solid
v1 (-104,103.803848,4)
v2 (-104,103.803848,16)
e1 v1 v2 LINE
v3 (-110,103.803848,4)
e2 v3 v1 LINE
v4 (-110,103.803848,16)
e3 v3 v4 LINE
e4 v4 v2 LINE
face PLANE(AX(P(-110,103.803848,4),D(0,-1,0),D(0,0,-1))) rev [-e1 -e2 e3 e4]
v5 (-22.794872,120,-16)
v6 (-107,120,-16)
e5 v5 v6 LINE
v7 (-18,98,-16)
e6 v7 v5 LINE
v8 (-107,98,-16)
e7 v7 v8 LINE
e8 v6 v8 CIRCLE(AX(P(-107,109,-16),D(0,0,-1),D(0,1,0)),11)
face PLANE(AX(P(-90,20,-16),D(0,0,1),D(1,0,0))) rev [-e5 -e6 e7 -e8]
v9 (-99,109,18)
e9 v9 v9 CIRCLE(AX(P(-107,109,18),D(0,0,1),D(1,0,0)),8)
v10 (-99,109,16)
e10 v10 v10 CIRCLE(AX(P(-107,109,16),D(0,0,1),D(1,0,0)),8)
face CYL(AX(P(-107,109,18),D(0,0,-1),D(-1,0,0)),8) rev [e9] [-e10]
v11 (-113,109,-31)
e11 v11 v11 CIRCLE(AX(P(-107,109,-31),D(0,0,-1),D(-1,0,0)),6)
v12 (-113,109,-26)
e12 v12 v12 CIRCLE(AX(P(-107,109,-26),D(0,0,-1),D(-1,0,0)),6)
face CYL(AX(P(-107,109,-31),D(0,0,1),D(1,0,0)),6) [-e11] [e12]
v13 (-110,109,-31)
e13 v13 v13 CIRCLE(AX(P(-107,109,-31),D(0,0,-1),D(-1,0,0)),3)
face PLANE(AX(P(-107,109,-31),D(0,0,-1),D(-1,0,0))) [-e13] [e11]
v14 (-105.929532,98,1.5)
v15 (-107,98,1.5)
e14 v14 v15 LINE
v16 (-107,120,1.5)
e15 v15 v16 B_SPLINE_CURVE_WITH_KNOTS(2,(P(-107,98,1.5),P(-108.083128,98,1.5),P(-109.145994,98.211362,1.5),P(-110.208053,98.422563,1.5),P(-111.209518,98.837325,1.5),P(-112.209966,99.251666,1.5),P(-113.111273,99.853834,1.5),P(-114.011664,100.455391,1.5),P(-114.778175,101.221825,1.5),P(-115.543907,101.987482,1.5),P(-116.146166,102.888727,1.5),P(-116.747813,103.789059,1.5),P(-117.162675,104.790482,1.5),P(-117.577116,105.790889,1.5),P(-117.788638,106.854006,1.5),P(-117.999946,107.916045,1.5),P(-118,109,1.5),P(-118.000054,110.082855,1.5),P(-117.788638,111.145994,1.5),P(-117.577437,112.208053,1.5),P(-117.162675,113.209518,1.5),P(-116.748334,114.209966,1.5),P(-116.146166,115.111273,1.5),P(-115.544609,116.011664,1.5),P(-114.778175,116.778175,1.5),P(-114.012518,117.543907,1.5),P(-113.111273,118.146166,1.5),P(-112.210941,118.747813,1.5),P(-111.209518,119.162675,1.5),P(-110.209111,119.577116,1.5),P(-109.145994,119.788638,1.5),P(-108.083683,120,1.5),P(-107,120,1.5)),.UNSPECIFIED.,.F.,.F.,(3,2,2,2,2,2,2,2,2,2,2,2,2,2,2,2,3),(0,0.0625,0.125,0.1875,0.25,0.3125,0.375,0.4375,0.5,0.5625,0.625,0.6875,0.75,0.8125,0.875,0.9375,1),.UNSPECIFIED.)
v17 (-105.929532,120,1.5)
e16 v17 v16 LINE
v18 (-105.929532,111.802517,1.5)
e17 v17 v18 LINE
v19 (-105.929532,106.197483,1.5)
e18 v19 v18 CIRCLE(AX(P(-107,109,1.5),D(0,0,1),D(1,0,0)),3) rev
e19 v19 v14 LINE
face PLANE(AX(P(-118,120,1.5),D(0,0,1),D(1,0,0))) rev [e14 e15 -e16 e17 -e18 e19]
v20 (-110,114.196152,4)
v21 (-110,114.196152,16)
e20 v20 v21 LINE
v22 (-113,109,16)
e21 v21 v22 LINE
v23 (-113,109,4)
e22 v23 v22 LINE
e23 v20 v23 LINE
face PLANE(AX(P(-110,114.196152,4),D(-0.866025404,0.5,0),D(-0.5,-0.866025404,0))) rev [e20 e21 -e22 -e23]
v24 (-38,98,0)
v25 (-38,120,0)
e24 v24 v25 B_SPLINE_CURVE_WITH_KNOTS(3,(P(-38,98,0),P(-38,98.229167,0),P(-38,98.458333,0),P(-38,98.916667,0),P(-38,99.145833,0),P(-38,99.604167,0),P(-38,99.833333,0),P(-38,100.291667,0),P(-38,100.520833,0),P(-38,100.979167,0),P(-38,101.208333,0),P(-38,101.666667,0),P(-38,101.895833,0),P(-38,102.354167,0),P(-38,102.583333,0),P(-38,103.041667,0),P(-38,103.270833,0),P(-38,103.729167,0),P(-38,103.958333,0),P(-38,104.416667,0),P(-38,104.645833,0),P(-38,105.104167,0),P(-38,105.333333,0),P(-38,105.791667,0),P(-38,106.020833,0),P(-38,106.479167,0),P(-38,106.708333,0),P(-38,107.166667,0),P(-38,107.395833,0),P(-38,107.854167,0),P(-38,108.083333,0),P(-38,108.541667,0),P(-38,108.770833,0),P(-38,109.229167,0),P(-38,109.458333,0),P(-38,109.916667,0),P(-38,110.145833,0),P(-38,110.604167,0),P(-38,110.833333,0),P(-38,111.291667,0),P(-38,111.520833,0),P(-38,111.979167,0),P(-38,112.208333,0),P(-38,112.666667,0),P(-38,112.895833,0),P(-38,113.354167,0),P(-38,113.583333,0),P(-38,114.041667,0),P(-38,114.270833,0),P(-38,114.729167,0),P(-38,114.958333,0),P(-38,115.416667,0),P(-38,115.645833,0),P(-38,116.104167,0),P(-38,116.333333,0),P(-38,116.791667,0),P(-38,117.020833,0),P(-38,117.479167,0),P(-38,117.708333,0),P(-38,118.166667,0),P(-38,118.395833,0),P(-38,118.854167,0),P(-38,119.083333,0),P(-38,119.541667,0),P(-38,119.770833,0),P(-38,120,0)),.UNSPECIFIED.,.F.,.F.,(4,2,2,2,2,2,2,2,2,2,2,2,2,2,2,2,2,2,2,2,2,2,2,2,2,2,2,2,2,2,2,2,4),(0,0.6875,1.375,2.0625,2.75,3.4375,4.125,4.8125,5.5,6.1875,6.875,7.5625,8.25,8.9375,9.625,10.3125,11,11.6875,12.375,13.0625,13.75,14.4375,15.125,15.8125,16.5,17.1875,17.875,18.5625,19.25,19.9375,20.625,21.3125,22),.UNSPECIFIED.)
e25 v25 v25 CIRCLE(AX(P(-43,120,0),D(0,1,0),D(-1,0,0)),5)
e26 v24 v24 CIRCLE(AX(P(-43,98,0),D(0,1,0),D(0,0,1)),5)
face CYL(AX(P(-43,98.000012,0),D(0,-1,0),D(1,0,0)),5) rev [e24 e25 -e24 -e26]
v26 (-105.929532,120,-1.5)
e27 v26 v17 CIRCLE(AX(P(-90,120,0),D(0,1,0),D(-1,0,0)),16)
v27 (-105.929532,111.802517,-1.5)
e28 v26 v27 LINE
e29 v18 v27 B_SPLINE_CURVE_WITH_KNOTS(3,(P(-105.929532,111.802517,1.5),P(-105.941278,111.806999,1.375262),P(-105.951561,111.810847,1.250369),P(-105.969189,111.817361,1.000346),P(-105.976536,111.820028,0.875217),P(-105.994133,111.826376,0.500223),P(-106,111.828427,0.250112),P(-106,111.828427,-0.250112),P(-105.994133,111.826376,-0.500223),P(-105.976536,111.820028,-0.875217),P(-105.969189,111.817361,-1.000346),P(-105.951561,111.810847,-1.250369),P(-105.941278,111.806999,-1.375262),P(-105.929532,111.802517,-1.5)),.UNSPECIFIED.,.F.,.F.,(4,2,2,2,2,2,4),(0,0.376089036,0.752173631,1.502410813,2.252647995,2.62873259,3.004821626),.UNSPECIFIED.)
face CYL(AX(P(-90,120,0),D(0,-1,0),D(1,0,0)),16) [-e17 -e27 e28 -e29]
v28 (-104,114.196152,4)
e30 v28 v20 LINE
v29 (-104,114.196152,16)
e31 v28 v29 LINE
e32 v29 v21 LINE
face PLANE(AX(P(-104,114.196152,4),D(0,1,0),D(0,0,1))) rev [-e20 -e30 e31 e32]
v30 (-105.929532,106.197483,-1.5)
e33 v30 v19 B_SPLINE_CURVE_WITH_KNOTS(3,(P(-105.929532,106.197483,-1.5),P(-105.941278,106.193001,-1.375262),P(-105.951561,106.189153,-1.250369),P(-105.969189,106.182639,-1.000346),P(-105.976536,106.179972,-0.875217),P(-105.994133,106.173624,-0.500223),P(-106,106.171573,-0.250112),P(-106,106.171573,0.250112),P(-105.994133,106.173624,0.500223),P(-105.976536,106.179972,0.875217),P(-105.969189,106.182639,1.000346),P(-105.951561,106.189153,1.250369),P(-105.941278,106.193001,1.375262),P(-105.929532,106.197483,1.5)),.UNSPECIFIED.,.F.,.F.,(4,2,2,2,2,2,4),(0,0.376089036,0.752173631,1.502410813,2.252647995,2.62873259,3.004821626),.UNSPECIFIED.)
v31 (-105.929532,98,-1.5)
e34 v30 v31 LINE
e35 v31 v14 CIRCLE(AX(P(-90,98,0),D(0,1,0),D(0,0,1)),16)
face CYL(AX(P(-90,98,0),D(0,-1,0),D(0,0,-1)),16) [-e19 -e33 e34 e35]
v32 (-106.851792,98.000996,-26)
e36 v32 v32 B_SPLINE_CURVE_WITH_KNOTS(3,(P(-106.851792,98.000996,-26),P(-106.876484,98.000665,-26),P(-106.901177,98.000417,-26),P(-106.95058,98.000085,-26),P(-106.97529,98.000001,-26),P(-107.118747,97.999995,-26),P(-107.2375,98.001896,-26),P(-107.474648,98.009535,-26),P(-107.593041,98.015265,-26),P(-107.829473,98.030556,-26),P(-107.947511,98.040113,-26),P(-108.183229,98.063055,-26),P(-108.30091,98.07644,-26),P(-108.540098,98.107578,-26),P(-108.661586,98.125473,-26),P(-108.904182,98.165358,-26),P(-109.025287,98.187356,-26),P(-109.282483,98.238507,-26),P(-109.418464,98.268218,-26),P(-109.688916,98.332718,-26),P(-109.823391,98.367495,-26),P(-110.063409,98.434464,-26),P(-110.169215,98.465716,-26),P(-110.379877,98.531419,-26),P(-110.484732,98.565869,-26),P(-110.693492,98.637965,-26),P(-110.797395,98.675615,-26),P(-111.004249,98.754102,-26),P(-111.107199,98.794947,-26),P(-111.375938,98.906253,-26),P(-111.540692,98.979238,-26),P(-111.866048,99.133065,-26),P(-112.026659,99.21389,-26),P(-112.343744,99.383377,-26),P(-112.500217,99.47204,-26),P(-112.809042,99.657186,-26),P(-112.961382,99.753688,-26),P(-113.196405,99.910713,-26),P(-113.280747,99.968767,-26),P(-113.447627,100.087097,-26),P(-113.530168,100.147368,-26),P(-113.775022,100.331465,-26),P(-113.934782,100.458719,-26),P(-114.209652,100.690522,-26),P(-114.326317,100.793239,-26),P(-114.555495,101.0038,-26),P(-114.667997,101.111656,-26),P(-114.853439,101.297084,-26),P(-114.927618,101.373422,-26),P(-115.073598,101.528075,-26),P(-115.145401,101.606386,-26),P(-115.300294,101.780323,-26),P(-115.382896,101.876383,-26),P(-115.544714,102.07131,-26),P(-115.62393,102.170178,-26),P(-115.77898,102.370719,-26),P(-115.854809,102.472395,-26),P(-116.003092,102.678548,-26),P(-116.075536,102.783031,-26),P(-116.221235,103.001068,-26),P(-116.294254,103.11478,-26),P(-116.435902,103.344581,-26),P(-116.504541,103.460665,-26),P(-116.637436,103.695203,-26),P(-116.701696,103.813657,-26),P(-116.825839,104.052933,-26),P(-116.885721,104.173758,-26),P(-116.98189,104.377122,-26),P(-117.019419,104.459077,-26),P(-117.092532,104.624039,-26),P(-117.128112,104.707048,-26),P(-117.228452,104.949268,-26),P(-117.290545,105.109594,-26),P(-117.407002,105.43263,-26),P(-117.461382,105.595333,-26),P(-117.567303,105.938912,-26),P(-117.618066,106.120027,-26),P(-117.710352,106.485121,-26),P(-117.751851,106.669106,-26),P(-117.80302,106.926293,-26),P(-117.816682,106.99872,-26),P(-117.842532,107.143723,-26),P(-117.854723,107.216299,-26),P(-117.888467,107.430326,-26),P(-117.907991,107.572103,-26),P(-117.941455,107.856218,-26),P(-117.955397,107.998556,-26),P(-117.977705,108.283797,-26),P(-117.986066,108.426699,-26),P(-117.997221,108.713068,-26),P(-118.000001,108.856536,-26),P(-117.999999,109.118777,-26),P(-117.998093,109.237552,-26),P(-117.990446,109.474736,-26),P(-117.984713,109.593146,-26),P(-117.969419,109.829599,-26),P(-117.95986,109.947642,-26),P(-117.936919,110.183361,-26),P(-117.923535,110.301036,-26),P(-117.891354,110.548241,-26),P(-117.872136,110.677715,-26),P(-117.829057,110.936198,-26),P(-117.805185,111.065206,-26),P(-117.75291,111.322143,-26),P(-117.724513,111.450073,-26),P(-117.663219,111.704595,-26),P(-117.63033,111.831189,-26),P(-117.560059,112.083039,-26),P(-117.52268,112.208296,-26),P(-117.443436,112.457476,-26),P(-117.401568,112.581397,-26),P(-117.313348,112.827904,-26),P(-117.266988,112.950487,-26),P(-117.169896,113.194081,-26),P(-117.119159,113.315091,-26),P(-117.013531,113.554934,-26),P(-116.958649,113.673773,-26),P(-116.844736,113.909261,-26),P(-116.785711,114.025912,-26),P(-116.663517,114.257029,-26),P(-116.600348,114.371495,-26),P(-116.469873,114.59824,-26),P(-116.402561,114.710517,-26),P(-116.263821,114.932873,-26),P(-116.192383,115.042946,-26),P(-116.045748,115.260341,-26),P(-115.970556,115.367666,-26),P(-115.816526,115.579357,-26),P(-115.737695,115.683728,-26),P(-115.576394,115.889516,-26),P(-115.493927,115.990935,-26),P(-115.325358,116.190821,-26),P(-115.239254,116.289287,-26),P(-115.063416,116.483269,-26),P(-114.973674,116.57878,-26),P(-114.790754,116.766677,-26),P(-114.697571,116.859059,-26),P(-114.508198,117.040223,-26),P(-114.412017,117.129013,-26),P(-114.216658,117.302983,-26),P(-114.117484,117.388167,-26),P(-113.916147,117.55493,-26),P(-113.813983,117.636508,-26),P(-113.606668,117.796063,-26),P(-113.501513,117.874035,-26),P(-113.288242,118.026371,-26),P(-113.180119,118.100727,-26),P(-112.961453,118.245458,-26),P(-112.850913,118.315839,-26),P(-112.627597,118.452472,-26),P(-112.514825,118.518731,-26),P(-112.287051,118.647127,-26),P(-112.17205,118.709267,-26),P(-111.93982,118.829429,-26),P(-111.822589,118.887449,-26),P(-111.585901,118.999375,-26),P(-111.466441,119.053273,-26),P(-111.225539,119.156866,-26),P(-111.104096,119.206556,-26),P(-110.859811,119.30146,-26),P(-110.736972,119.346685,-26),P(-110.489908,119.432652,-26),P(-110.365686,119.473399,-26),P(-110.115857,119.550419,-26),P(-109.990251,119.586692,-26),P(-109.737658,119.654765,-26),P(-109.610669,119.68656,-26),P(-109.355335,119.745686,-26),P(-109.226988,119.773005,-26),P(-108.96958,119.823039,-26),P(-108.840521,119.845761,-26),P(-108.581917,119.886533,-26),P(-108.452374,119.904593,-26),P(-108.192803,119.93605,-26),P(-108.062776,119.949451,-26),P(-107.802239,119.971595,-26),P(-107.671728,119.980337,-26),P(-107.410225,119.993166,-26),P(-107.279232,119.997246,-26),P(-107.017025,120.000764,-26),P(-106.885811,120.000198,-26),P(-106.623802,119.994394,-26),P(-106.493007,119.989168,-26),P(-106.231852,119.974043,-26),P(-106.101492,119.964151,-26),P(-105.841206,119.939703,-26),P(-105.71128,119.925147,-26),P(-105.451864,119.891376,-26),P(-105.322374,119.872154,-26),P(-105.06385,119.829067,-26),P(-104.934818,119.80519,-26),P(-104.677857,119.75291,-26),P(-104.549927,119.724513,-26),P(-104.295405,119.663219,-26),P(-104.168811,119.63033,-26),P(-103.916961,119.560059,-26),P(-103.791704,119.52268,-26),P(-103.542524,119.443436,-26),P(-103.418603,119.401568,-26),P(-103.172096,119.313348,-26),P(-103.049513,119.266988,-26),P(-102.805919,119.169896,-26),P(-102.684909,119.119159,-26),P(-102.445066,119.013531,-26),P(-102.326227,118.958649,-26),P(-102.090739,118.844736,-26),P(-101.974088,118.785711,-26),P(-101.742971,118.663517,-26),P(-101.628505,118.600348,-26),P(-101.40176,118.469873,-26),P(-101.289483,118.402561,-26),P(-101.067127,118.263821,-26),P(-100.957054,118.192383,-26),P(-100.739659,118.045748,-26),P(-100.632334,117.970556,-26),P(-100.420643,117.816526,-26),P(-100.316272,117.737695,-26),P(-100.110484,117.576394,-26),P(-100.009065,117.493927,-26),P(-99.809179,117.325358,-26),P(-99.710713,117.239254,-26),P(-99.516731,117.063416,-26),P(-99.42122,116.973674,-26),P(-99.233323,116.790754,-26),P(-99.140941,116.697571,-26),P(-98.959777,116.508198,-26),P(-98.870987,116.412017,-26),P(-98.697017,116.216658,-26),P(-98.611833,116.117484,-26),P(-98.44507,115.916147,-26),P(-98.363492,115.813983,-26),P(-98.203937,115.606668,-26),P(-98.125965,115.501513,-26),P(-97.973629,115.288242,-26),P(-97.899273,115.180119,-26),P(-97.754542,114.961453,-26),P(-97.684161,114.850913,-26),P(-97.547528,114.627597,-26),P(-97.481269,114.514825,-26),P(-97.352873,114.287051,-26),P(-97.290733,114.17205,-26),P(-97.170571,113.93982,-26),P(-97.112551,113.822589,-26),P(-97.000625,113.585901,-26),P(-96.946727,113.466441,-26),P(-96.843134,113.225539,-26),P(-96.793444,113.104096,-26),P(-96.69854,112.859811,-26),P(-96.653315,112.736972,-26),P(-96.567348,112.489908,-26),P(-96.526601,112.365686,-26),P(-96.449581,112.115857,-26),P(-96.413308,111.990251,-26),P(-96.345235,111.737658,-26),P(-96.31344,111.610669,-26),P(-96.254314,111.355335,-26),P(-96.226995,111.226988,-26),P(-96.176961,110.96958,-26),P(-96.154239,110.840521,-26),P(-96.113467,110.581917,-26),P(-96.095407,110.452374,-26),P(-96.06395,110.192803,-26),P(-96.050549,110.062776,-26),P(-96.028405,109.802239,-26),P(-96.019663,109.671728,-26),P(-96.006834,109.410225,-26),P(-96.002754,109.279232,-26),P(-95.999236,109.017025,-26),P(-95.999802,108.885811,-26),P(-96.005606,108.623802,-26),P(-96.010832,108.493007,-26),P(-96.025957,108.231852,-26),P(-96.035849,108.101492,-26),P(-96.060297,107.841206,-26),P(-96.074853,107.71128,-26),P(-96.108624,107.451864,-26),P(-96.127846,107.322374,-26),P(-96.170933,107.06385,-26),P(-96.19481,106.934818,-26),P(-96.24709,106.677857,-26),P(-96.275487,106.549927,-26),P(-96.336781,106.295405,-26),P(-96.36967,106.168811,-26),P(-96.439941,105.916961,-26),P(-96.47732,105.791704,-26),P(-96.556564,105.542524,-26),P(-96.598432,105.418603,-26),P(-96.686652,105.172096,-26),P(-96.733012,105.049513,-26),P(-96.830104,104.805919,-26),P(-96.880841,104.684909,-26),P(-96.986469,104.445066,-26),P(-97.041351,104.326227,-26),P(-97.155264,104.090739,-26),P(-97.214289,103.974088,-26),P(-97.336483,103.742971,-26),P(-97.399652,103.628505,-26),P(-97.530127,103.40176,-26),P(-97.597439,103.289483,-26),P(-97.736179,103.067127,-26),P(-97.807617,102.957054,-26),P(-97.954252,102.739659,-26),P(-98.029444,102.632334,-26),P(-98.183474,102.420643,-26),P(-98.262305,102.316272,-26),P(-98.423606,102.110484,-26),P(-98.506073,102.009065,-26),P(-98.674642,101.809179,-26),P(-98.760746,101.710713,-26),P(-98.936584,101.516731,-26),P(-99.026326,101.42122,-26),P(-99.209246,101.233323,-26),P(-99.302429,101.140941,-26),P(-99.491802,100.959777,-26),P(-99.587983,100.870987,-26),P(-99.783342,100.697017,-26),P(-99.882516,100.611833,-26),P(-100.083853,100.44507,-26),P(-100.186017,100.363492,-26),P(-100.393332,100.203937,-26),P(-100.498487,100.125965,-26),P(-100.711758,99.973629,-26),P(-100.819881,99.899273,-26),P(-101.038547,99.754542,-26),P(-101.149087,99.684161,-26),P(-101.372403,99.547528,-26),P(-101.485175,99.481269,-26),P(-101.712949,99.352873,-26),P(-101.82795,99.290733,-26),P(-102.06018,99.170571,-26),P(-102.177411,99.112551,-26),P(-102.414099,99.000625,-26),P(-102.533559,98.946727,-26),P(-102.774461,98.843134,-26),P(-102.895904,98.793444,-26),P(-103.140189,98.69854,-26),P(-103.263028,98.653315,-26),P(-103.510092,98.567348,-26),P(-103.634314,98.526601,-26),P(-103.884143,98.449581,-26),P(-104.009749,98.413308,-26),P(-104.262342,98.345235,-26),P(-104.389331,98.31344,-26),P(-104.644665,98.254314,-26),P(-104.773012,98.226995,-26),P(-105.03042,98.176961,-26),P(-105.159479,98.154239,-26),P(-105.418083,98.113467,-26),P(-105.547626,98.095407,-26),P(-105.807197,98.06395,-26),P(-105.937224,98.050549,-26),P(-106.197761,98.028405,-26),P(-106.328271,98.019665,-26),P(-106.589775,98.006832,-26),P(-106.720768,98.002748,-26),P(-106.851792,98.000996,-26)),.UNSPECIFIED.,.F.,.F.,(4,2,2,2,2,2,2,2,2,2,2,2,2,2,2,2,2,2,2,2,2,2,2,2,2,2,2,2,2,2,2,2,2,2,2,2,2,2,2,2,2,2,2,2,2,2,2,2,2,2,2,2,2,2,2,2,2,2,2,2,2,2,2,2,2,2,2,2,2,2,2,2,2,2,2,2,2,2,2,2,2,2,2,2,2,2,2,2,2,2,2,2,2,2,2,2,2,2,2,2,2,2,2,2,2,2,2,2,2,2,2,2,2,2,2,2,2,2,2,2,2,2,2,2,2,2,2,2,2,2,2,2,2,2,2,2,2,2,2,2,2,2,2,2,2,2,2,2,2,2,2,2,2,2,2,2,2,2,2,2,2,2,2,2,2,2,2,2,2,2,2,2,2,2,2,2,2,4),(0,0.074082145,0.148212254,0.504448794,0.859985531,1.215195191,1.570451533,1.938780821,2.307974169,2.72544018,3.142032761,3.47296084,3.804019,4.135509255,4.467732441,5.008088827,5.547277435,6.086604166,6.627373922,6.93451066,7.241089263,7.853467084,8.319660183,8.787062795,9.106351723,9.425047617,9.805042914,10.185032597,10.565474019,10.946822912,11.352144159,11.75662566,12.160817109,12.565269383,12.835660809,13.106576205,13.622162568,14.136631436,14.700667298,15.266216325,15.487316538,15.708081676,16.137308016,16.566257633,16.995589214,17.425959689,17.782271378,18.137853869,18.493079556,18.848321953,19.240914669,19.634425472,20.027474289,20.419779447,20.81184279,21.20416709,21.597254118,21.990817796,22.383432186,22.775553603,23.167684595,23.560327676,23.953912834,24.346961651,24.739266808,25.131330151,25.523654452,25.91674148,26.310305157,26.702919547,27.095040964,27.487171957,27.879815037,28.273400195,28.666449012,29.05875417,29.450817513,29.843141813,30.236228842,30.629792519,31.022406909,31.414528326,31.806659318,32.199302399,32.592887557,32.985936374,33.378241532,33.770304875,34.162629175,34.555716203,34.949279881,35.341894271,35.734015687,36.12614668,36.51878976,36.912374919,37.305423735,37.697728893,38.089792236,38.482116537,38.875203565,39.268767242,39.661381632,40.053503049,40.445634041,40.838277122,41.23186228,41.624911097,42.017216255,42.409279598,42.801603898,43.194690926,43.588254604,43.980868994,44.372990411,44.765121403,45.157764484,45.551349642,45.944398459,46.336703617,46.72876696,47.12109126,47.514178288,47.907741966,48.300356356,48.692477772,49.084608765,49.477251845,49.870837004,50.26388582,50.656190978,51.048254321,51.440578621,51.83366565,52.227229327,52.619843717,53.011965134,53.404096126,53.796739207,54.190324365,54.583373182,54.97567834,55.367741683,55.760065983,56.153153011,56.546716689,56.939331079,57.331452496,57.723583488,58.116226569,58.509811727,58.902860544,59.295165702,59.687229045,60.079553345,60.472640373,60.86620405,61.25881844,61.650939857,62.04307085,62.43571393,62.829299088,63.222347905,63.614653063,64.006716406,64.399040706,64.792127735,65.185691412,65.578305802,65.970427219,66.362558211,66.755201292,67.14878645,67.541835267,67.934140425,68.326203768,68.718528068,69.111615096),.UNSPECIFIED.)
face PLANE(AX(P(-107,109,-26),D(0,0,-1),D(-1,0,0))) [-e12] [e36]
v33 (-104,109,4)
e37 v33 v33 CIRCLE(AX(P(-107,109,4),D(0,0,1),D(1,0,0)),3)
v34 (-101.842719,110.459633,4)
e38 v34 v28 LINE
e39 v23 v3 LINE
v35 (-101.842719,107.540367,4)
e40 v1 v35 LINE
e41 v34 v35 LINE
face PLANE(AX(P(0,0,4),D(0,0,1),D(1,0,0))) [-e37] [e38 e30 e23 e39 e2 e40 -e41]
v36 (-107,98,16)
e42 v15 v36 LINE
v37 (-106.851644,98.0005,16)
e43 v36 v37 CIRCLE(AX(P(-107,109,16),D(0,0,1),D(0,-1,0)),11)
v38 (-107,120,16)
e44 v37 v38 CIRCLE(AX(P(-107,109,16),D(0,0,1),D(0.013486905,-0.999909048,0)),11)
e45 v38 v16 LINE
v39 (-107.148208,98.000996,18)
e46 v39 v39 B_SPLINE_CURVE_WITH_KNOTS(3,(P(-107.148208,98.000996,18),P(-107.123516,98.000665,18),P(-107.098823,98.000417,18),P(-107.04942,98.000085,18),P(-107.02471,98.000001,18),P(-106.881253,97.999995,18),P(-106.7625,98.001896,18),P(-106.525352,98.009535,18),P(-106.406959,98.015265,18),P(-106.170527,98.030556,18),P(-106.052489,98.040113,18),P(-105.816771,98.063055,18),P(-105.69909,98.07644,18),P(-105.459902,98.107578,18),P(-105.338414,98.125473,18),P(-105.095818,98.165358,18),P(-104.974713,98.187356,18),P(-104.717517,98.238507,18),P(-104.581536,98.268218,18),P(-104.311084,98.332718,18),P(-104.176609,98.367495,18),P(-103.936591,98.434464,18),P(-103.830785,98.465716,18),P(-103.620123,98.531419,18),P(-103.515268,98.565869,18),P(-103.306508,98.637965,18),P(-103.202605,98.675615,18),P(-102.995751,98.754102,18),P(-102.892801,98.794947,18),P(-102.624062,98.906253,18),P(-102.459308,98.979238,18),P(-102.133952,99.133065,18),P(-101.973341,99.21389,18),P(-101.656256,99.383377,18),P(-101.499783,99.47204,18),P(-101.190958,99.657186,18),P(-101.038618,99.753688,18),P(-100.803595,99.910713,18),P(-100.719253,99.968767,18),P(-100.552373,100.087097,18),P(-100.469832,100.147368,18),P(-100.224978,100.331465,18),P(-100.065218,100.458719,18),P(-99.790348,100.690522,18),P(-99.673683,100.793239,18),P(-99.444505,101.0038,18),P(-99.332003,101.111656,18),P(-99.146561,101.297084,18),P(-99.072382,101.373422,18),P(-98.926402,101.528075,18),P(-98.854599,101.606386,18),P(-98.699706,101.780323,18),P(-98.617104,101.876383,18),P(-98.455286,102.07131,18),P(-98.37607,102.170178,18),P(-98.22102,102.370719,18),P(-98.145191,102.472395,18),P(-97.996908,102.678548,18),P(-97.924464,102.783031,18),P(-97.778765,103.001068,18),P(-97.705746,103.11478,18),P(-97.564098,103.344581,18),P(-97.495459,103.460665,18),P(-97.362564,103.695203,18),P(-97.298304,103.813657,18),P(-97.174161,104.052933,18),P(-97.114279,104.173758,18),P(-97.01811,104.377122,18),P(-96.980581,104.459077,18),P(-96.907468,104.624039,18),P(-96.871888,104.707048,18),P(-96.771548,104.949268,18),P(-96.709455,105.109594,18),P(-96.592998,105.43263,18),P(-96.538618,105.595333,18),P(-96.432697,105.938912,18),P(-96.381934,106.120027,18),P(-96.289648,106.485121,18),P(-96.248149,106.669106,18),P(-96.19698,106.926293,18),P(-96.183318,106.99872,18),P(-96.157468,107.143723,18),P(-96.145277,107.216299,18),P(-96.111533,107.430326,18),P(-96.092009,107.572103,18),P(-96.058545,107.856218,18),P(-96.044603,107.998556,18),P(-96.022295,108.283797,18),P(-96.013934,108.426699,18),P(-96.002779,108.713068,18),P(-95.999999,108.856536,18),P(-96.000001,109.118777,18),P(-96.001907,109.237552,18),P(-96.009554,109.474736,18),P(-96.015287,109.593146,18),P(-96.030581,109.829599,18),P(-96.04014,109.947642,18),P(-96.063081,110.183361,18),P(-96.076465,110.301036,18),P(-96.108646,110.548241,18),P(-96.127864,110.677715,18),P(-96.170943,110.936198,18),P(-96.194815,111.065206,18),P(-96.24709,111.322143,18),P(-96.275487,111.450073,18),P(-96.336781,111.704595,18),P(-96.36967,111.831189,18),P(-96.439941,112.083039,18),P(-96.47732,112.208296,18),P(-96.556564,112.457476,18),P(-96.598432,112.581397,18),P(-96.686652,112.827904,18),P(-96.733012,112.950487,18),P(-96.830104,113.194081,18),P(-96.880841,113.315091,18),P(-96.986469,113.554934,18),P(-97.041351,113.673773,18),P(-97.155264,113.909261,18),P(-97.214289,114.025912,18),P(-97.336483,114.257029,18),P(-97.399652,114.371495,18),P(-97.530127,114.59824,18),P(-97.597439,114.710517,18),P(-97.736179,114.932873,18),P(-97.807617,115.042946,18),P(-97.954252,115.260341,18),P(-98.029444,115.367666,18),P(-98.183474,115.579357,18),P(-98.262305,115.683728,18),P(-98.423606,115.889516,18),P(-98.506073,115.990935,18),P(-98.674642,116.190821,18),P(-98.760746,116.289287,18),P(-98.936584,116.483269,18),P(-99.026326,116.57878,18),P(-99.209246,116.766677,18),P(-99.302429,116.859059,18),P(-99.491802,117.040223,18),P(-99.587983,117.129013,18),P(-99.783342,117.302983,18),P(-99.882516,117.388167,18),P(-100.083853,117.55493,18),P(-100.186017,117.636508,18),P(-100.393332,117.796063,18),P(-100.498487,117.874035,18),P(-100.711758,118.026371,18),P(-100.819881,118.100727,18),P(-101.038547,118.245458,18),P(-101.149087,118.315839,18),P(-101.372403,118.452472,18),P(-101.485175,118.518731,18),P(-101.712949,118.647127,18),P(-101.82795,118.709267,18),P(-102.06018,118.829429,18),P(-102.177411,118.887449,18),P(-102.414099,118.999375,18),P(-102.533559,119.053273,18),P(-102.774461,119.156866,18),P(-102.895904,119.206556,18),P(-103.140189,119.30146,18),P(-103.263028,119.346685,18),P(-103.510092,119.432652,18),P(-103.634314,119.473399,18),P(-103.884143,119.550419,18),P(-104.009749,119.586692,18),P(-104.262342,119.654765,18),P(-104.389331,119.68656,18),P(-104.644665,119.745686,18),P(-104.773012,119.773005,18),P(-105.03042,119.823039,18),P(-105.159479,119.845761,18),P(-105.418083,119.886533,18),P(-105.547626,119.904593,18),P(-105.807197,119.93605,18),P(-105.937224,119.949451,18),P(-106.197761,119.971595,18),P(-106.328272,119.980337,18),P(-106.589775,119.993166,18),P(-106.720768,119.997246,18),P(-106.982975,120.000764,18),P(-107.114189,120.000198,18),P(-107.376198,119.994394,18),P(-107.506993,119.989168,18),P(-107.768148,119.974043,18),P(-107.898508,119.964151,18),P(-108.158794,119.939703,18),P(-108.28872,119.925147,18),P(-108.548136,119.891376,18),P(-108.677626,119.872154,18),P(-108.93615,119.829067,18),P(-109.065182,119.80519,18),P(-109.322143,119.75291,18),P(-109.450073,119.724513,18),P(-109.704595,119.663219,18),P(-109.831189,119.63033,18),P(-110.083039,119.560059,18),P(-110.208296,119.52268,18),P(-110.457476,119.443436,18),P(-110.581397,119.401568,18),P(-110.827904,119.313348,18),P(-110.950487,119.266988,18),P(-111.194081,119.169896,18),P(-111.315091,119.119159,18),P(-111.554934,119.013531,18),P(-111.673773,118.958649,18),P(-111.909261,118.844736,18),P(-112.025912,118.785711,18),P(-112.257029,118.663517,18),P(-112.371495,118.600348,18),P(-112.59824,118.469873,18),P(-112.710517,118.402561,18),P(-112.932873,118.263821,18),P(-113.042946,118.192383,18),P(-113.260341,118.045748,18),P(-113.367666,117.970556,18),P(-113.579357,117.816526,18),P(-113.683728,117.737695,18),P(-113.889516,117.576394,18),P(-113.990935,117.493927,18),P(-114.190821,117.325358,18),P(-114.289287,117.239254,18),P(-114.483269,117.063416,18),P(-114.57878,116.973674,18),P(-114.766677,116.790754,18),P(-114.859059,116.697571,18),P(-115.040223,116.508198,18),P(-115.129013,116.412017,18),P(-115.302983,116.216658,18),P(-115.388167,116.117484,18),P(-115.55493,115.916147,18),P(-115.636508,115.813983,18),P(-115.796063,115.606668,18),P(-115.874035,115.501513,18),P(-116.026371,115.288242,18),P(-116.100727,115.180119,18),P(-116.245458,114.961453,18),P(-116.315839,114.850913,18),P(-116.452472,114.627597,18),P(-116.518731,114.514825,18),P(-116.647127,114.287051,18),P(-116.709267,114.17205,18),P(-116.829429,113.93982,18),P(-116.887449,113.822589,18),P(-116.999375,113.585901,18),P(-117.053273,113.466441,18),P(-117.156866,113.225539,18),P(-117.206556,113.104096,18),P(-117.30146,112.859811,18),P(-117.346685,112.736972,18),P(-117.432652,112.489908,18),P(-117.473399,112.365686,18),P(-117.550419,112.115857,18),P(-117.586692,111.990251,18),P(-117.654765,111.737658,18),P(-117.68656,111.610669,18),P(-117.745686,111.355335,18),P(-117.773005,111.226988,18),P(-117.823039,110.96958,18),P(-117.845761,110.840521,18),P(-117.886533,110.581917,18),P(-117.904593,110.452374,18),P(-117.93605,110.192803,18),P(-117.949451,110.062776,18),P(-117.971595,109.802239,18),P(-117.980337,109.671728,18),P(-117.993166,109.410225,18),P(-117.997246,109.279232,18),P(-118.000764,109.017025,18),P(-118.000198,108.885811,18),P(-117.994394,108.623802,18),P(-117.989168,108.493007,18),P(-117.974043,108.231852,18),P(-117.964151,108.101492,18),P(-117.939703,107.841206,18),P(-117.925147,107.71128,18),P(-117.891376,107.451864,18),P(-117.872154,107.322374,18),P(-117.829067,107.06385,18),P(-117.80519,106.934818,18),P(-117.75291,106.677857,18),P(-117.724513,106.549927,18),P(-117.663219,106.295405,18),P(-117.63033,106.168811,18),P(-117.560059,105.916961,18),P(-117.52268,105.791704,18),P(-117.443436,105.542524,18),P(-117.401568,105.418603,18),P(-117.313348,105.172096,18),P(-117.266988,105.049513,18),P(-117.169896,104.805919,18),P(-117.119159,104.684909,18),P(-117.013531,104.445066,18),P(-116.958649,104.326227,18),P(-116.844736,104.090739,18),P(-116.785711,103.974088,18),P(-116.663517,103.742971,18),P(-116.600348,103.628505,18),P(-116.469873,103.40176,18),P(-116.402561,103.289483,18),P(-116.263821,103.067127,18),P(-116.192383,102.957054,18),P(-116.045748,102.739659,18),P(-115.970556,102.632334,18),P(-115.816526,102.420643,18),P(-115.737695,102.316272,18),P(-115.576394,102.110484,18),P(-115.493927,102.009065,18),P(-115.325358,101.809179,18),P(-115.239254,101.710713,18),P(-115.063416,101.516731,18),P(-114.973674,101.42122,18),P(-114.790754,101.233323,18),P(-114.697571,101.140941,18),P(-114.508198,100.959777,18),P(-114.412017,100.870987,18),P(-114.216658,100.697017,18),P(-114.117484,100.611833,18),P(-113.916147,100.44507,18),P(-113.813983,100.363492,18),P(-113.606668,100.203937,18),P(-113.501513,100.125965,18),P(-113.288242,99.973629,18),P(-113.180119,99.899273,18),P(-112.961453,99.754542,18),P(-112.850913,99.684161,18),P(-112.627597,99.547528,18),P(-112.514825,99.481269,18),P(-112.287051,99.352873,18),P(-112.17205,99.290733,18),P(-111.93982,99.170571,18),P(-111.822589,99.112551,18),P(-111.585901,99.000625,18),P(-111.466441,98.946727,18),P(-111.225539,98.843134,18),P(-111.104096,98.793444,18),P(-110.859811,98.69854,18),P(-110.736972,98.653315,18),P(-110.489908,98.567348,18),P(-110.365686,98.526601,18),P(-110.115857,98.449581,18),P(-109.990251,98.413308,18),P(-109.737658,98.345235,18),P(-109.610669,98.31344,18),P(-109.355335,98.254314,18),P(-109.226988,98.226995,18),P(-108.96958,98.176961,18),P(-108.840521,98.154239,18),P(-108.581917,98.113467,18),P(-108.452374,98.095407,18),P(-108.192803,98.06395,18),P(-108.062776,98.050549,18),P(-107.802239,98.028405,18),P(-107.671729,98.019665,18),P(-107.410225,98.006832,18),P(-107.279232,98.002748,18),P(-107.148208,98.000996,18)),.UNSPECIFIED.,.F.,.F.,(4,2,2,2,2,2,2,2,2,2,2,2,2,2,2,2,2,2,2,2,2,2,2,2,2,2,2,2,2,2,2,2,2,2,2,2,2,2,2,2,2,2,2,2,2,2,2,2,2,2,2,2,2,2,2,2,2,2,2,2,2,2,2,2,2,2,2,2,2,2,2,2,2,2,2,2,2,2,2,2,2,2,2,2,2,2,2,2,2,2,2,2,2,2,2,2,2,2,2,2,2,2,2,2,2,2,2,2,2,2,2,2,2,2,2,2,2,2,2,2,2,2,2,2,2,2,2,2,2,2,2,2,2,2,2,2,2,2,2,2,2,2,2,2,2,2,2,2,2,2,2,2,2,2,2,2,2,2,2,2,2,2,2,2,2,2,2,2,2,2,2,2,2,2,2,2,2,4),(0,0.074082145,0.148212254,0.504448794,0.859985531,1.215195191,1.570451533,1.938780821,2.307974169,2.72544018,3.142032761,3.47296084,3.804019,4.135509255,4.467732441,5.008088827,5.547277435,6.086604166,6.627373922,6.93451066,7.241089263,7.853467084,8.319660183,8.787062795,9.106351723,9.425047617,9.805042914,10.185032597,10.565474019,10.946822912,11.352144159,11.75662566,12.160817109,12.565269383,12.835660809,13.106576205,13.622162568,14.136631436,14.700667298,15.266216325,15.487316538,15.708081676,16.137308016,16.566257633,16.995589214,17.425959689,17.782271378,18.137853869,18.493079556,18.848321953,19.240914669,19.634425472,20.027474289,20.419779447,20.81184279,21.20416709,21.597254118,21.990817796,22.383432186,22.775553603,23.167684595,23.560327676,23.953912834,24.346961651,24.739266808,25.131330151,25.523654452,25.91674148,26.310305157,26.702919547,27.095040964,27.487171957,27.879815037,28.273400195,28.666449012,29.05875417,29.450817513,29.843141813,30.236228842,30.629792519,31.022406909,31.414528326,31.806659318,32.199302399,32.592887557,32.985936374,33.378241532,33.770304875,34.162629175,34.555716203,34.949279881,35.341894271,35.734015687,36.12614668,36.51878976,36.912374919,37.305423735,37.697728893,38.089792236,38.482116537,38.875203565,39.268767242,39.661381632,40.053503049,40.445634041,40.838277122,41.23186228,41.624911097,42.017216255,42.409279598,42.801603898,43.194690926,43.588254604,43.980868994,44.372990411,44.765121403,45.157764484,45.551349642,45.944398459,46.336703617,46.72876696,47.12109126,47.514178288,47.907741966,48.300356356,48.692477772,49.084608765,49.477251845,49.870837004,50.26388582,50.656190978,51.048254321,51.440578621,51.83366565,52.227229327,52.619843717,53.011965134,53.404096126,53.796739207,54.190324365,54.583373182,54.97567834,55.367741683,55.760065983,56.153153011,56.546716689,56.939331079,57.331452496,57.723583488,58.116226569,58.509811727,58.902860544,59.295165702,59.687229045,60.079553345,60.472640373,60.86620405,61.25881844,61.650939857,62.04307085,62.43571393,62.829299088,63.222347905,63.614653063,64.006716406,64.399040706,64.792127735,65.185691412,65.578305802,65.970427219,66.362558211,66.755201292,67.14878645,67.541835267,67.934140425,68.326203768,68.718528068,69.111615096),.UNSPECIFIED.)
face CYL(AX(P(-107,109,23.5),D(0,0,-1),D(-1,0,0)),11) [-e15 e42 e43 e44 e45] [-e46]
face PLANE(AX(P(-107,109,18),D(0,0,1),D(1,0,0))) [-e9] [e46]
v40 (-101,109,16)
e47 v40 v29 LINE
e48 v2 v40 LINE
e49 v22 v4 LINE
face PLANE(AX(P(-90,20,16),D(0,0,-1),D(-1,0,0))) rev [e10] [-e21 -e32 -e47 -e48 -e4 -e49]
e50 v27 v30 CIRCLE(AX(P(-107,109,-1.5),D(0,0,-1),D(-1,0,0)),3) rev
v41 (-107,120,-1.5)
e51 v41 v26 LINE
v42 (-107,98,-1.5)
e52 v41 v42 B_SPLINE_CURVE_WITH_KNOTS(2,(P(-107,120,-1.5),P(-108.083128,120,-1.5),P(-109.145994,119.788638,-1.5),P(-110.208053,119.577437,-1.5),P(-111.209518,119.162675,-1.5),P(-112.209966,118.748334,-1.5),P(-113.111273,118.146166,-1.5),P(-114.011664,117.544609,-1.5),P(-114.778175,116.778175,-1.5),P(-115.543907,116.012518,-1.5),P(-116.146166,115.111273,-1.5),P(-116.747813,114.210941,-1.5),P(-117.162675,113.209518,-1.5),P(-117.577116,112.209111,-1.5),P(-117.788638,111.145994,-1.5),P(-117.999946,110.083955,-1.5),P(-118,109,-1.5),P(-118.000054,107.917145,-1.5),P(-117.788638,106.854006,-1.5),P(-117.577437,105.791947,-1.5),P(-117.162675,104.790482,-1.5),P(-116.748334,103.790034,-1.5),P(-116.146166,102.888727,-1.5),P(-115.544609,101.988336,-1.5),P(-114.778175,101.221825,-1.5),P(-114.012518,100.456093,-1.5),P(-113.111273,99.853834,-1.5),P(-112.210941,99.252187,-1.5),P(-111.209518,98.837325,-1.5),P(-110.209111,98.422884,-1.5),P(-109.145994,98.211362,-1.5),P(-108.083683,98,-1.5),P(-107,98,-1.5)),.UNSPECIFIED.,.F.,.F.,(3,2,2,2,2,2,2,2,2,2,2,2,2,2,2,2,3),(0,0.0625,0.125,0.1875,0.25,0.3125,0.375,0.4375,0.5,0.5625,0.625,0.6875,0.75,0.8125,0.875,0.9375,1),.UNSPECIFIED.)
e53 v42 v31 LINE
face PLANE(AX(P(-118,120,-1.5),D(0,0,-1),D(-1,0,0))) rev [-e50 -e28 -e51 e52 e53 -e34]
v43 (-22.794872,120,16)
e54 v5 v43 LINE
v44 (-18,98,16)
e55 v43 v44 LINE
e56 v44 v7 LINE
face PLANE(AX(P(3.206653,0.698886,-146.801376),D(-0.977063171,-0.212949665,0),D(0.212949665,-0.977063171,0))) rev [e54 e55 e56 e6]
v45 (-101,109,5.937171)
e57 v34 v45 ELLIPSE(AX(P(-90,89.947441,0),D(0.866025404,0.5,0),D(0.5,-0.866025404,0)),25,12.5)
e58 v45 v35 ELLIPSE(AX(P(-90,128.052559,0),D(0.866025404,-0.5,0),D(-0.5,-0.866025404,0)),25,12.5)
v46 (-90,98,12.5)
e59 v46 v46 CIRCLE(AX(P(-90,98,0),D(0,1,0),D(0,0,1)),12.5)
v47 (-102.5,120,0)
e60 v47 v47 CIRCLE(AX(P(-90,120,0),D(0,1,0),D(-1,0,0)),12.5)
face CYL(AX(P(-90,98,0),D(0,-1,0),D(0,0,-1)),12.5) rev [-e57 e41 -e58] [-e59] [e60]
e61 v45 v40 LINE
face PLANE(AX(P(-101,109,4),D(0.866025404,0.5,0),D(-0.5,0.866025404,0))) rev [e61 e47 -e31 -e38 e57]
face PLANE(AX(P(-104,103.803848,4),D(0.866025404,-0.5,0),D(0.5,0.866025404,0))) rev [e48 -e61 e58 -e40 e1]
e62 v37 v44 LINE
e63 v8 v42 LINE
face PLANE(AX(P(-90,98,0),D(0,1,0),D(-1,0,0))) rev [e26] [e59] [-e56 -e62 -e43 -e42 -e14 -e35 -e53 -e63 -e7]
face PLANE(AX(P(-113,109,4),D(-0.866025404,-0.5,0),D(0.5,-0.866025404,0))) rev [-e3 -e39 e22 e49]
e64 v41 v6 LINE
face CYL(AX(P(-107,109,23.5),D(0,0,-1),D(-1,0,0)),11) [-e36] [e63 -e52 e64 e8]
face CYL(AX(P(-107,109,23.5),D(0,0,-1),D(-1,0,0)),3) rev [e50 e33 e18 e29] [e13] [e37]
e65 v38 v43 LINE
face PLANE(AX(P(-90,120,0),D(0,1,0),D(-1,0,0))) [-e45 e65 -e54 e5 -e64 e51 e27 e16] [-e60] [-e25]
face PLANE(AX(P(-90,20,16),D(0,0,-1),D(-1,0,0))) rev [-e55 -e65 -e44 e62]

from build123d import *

# Parameters (mm, degrees)
BOSS_EXTRUDE1_DEPTH            = 20
SKETCH2_R                      = 12.5
CUT_EXTRUDE1_DEPTH             = 20
CUT_EXTRUDE3_DEPTH             = 16
BOSS_EXTRUDE9_DEPTH            = 32
CUT_EXTRUDE5_OUTLINE_R         = 12.5
CUT_EXTRUDE5_DEPTH             = 20
SKETCH10_R                     = 7.5
BOSS_EXTRUDE10_DEPTH           = 6
SKETCH11_R                     = 6.5
BOSS_EXTRUDE11_DEPTH           = 5
FILLET5_R                      = 1
FILLET6_R                      = 1
CUT_EXTRUDE7_DEPTH             = 147.965990964
CUT_EXTRUDE7_DEPTH_BACK        = 147.965990964
CUT_EXTRUDE8_REACH             = 148.864
SKETCH21_R                     = 5
CUT_EXTRUDE8_DIRECTION_2_DEPTH = 147.863882558
SKETCH23_R                     = 12.5
SKETCH23_R_2                   = 5
BOSS_EXTRUDE12_DEPTH           = 22
CUT_EXTRUDE13_DEPTH            = 174.703770828
CUT_EXTRUDE13_DEPTH_BACK       = 45
SKETCH24_R                     = 3
SKETCH25_R                     = 11
SKETCH25_R_2                   = 8
BOSS_EXTRUDE13_DEPTH           = 2
BOSS_EXTRUDE14_START           = 10
SKETCH26_R                     = 11
SKETCH26_R_2                   = 3
BOSS_EXTRUDE14_DEPTH           = 10
SKETCH27_R                     = 6
SKETCH27_R_2                   = 3
BOSS_EXTRUDE15_DEPTH           = 5
CUT_EXTRUDE15_DEPTH            = 12


# Read off the part's stored shape, not the designer's step: Cut-Extrude5
with BuildPart() as part:
    # Sketch1 → Boss-Extrude1 (new body)
    with BuildSketch(Plane(origin=(0, 0, 0), x_dir=(1, 0, 0), z_dir=(0, 1, 0))):
        with BuildLine():
            Line((-90, 16), (13.288085522, 16))
            ThreePointArc((13.288085522, 16), (37.171658785, 22.533063908), (53.648380073, 4.05))
            Line((53.648380073, 4.05), (68.648380073, 4.05))
            Line((68.648380073, 4.05), (68.648380073, 0.05))
            Line((68.648380073, 0.05), (53.999946808, 0.05))
            ThreePointArc((53.999946808, 0.05), (54, 0), (53.999946808, -0.05))
            Line((53.999946808, -0.05), (68.648380073, -0.05))
            Line((68.648380073, -0.05), (68.648380073, -4.05))
            Line((68.648380073, -4.05), (53.648380073, -4.05))
            ThreePointArc((53.648380073, -4.05), (37.171658785, -22.533063908), (13.288085522, -16))
            Line((13.288085522, -16), (-90, -16))
            ThreePointArc((-90, -16), (-106, 0), (-90, 16))
        make_face()
    extrude(amount=BOSS_EXTRUDE1_DEPTH)

    # Sketch2 → Cut-Extrude1 (cut)
    with BuildSketch(Plane.XZ):
        with Locations(Location((-90, 0, 0), (0, 0, 270))):
            Circle(SKETCH2_R)
        with BuildLine():
            Line((53.999946808, -0.05), (51.99994186, -0.05))
            ThreePointArc((51.99994186, -0.05), (9, 0), (51.99994186, 0.05))
            Line((51.99994186, 0.05), (53.999946808, 0.05))
            ThreePointArc((53.999946808, 0.05), (54, 0), (53.999946808, -0.05))
        make_face()
    extrude(amount=-CUT_EXTRUDE1_DEPTH, mode=Mode.SUBTRACT)

    # Sketch3 → Cut-Extrude3 (cut)
    with BuildSketch(Plane.XZ):
        with BuildLine():
            Line((-79.416994756, -12), (10.294802649, -12))
            ThreePointArc((10.294802649, -12), (7, 0), (10.294802649, 12))
            Line((10.294802649, 12), (-79.416994756, 12))
            ThreePointArc((-79.416994756, 12), (-75.416994756, 6.583005244), (-74, 0))
            ThreePointArc((-74, 0), (-75.416994756, -6.583005244), (-79.416994756, -12))
        make_face()
    extrude(amount=-CUT_EXTRUDE3_DEPTH, mode=Mode.SUBTRACT)

    # Sketch7 → Boss-Extrude9 (add)
    with BuildSketch(Plane.XY.offset(16)):
        Polygon((-106, 78), (-35.641025641, 78), (-23, 20), (-1, 20), (-18, 98), (-106, 98), align=None)
    extrude(amount=-BOSS_EXTRUDE9_DEPTH)

    # Cut-Extrude5 outline → Cut-Extrude5 (cut)
    with BuildSketch(Plane(origin=(0, 78, 0), x_dir=(1, 0, 0), z_dir=(0, 1, 0))):
        with BuildLine():
            Line((-106, -16), (-90, -16))
            ThreePointArc((-90, -16), (-101.313708581, -11.313708417), (-106, 2.31e-07))
            Line((-106, 2.31e-07), (-106, -16))
        make_face()
        with BuildLine():
            Line((-106, 16), (-106, 2.31e-07))
            ThreePointArc((-106, 2.31e-07), (-101.313708417, 11.313708581), (-90, 16))
            Line((-90, 16), (-106, 16))
        make_face()
        with Locations((-90, 0)):
            Circle(CUT_EXTRUDE5_OUTLINE_R)
    extrude(amount=CUT_EXTRUDE5_DEPTH, mode=Mode.SUBTRACT)

    # Sketch10 → Boss-Extrude10 (add)
    with BuildSketch(Plane(origin=(0, 0, -16), x_dir=(-1, 0, 0), z_dir=(0, 0, -1))):
        with Locations(Location((24, 65, 0), (0, 0, 180))):
            Circle(SKETCH10_R)
    extrude(amount=BOSS_EXTRUDE10_DEPTH)

    # Sketch11 → Boss-Extrude11 (add)
    with BuildSketch(Plane(origin=(0, 0, -22), x_dir=(-1, 0, 0), z_dir=(0, 0, -1))):
        with Locations((24, 65)):
            Circle(SKETCH11_R)
    extrude(amount=BOSS_EXTRUDE11_DEPTH)

    # Fillet5
    fillet5_edges = [part.edges().sort_by_distance(p)[0] for p in [
        (-31.5, 65, -16),
        (-17.5, 65, -27),
        (10.294802649, 8, 12),
        (7, 0, 0),
        (10.294802649, 8, -12),
        (-34.561096053, 0, -12),
        (-79.416994756, 8, -12),
        (-74, 0, 0),
        (-79.416994756, 8, 12),
        (-34.561096053, 0, 12),
        (-34.561096053, 16, 12),
        (7, 16, 0),
        (-74, 16, 0),
    ]]
    fillet(fillet5_edges, radius=FILLET5_R)

    # Fillet6
    fillet6_edges = [part.edges().sort_by_distance(p)[0] for p in [
        (-31.5, 65, -22),
    ]]
    fillet(fillet6_edges, radius=FILLET6_R - 0.0001)  # a hair under: the kernel refuses the full size

    # Sketch20 → Cut-Extrude7 (cut, two sides: drawn at the far end of the back side and taken through both)
    with BuildSketch(Plane(origin=(0, 0, -4.05), x_dir=(-1, 0, 0), z_dir=(0, 0, -1)).offset(-CUT_EXTRUDE7_DEPTH_BACK)):
        with BuildLine():
            Line((-68.648380073, 20), (-68.648380073, 10))
            ThreePointArc((-68.648380073, 10), (-65.719447885, 17.071067812), (-58.648380073, 20))
            Line((-58.648380073, 20), (-68.648380073, 20))
        make_face()
        with BuildLine():
            Line((-68.648380073, 0), (-58.648380073, 0))
            ThreePointArc((-58.648380073, 0), (-65.719447885, 2.928932188), (-68.648380073, 10))
            Line((-68.648380073, 10), (-68.648380073, 0))
        make_face()
        with BuildLine():
            ThreePointArc((-65.648380073, 10), (-59.648380073, 4), (-53.648380073, 10))
            Line((-53.648380073, 10), (-65.648380073, 10))
        make_face()
        with BuildLine():
            Line((-65.648380073, 10), (-53.648380073, 10))
            ThreePointArc((-53.648380073, 10), (-59.648380073, 16), (-65.648380073, 10))
        make_face()
    extrude(amount=CUT_EXTRUDE7_DEPTH + CUT_EXTRUDE7_DEPTH_BACK, mode=Mode.SUBTRACT)

    # Sketch21 → Cut-Extrude8 (cut, up to next)
    with BuildSketch(Plane(origin=(0, 98, 0), x_dir=(1, 0, 0), z_dir=(0, 1, 0)), mode=Mode.PRIVATE) as cut_extrude8_sk1:
        with Locations((-43, 0)):
            Circle(SKETCH21_R)
    cut_extrude8_tool1 = extrude(cut_extrude8_sk1.sketch, amount=-CUT_EXTRUDE8_REACH, mode=Mode.PRIVATE) & part.part
    add(cut_extrude8_tool1.solids().sort_by_distance((-43, 98, 0))[0], mode=Mode.SUBTRACT)

    # Sketch21 → Cut-Extrude8 direction 2 (cut)
    with BuildSketch(Plane(origin=(0, 98, 0), x_dir=(1, 0, 0), z_dir=(0, 1, 0))):
        with Locations((-43, 0)):
            Circle(SKETCH21_R)
    extrude(amount=CUT_EXTRUDE8_DIRECTION_2_DEPTH, mode=Mode.SUBTRACT)



with BuildPart() as body_2:
    # Sketch23 → Boss-Extrude12 (new body)
    with BuildSketch(Plane(origin=(0, 98, 0), x_dir=(1, 0, 0), z_dir=(0, 1, 0))):
        with BuildLine():
            Line((-118, -1.5), (-118, -16))
            Line((-118, -16), (-90, -16))
            Line((-90, -16), (-18, -16))
            Line((-18, -16), (-18, 16))
            Line((-18, 16), (-90, 16))
            Line((-90, 16), (-118, 16))
            Line((-118, 16), (-118, 1.5))
            Line((-118, 1.5), (-105.929532322, 1.5))
            ThreePointArc((-105.929532322, 1.5), (-106, 0), (-105.929532322, -1.5))
            Line((-105.929532322, -1.5), (-118, -1.5))
        make_face()
        with Locations(Location((-90, 0, 0), (0, 0, 90))):
            Circle(SKETCH23_R, mode=Mode.SUBTRACT)
        with Locations((-43, 0)):
            Circle(SKETCH23_R_2, mode=Mode.SUBTRACT)
    extrude(amount=BOSS_EXTRUDE12_DEPTH)

    # Sketch24 → Cut-Extrude13 (cut, two sides: drawn at the far end of the back side and taken through both)
    with BuildSketch(Plane.XY.offset(16).offset(-CUT_EXTRUDE13_DEPTH_BACK)):
        with BuildLine():
            ThreePointArc((-118, 109), (-114.778174593, 116.778174593), (-107, 120))
            Line((-107, 120), (-118, 120))
            Line((-118, 120), (-118, 109))
        make_face()
        with BuildLine():
            Line((-118, 98), (-107, 98))
            ThreePointArc((-107, 98), (-114.778174593, 101.221825407), (-118, 109))
            Line((-118, 109), (-118, 98))
        make_face()
        Polygon((-22.794871795, 120), (-18, 98), (-18, 120), align=None)
        with Locations(Location((-107, 109, 0), (0, 0, 180))):
            Circle(SKETCH24_R)
    extrude(amount=CUT_EXTRUDE13_DEPTH + CUT_EXTRUDE13_DEPTH_BACK, mode=Mode.SUBTRACT)


with BuildPart() as part_1:
    add(part.part)

    add(body_2.part)  # Boss-Extrude13 merges body 2
    # Sketch25 → Boss-Extrude13 (add)
    with BuildSketch(Plane.XY.offset(16)):
        with Locations(Location((-107, 109, 0), (0, 0, 270))):
            Circle(SKETCH25_R)
        with Locations((-107, 109)):
            Circle(SKETCH25_R_2, mode=Mode.SUBTRACT)
    extrude(amount=BOSS_EXTRUDE13_DEPTH)

    # Sketch26 → Boss-Extrude14 (add)
    with BuildSketch(Plane(origin=(0, 0, -16), x_dir=(-1, 0, 0), z_dir=(0, 0, -1)).offset(BOSS_EXTRUDE14_START)):
        with Locations(Location((107, 109, 0), (0, 0, 270))):
            Circle(SKETCH26_R)
        with Locations((107, 109)):
            Circle(SKETCH26_R_2, mode=Mode.SUBTRACT)
    extrude(amount=-BOSS_EXTRUDE14_DEPTH)

    # Sketch27 → Boss-Extrude15 (add)
    with BuildSketch(Plane(origin=(0, 0, -26), x_dir=(-1, 0, 0), z_dir=(0, 0, -1))):
        with Locations((107, 109)):
            Circle(SKETCH27_R)
        with Locations((107, 109)):
            Circle(SKETCH27_R_2, mode=Mode.SUBTRACT)
    extrude(amount=BOSS_EXTRUDE15_DEPTH)

    # Sketch29 → Cut-Extrude15 (cut)
    with BuildSketch(Plane.XY.offset(16)):
        Polygon((-104, 114.196152423), (-110, 114.196152423), (-113, 109), (-110, 103.803847577), (-104, 103.803847577), (-101, 109), align=None)
    extrude(amount=-CUT_EXTRUDE15_DEPTH, mode=Mode.SUBTRACT)

    # SurfaceCut1
    split(bisect_by=Plane(origin=(0, 98, 0), x_dir=(1, 0, 0), z_dir=(0, 1, 0)), keep=Keep.TOP)


solid = part_1.part
